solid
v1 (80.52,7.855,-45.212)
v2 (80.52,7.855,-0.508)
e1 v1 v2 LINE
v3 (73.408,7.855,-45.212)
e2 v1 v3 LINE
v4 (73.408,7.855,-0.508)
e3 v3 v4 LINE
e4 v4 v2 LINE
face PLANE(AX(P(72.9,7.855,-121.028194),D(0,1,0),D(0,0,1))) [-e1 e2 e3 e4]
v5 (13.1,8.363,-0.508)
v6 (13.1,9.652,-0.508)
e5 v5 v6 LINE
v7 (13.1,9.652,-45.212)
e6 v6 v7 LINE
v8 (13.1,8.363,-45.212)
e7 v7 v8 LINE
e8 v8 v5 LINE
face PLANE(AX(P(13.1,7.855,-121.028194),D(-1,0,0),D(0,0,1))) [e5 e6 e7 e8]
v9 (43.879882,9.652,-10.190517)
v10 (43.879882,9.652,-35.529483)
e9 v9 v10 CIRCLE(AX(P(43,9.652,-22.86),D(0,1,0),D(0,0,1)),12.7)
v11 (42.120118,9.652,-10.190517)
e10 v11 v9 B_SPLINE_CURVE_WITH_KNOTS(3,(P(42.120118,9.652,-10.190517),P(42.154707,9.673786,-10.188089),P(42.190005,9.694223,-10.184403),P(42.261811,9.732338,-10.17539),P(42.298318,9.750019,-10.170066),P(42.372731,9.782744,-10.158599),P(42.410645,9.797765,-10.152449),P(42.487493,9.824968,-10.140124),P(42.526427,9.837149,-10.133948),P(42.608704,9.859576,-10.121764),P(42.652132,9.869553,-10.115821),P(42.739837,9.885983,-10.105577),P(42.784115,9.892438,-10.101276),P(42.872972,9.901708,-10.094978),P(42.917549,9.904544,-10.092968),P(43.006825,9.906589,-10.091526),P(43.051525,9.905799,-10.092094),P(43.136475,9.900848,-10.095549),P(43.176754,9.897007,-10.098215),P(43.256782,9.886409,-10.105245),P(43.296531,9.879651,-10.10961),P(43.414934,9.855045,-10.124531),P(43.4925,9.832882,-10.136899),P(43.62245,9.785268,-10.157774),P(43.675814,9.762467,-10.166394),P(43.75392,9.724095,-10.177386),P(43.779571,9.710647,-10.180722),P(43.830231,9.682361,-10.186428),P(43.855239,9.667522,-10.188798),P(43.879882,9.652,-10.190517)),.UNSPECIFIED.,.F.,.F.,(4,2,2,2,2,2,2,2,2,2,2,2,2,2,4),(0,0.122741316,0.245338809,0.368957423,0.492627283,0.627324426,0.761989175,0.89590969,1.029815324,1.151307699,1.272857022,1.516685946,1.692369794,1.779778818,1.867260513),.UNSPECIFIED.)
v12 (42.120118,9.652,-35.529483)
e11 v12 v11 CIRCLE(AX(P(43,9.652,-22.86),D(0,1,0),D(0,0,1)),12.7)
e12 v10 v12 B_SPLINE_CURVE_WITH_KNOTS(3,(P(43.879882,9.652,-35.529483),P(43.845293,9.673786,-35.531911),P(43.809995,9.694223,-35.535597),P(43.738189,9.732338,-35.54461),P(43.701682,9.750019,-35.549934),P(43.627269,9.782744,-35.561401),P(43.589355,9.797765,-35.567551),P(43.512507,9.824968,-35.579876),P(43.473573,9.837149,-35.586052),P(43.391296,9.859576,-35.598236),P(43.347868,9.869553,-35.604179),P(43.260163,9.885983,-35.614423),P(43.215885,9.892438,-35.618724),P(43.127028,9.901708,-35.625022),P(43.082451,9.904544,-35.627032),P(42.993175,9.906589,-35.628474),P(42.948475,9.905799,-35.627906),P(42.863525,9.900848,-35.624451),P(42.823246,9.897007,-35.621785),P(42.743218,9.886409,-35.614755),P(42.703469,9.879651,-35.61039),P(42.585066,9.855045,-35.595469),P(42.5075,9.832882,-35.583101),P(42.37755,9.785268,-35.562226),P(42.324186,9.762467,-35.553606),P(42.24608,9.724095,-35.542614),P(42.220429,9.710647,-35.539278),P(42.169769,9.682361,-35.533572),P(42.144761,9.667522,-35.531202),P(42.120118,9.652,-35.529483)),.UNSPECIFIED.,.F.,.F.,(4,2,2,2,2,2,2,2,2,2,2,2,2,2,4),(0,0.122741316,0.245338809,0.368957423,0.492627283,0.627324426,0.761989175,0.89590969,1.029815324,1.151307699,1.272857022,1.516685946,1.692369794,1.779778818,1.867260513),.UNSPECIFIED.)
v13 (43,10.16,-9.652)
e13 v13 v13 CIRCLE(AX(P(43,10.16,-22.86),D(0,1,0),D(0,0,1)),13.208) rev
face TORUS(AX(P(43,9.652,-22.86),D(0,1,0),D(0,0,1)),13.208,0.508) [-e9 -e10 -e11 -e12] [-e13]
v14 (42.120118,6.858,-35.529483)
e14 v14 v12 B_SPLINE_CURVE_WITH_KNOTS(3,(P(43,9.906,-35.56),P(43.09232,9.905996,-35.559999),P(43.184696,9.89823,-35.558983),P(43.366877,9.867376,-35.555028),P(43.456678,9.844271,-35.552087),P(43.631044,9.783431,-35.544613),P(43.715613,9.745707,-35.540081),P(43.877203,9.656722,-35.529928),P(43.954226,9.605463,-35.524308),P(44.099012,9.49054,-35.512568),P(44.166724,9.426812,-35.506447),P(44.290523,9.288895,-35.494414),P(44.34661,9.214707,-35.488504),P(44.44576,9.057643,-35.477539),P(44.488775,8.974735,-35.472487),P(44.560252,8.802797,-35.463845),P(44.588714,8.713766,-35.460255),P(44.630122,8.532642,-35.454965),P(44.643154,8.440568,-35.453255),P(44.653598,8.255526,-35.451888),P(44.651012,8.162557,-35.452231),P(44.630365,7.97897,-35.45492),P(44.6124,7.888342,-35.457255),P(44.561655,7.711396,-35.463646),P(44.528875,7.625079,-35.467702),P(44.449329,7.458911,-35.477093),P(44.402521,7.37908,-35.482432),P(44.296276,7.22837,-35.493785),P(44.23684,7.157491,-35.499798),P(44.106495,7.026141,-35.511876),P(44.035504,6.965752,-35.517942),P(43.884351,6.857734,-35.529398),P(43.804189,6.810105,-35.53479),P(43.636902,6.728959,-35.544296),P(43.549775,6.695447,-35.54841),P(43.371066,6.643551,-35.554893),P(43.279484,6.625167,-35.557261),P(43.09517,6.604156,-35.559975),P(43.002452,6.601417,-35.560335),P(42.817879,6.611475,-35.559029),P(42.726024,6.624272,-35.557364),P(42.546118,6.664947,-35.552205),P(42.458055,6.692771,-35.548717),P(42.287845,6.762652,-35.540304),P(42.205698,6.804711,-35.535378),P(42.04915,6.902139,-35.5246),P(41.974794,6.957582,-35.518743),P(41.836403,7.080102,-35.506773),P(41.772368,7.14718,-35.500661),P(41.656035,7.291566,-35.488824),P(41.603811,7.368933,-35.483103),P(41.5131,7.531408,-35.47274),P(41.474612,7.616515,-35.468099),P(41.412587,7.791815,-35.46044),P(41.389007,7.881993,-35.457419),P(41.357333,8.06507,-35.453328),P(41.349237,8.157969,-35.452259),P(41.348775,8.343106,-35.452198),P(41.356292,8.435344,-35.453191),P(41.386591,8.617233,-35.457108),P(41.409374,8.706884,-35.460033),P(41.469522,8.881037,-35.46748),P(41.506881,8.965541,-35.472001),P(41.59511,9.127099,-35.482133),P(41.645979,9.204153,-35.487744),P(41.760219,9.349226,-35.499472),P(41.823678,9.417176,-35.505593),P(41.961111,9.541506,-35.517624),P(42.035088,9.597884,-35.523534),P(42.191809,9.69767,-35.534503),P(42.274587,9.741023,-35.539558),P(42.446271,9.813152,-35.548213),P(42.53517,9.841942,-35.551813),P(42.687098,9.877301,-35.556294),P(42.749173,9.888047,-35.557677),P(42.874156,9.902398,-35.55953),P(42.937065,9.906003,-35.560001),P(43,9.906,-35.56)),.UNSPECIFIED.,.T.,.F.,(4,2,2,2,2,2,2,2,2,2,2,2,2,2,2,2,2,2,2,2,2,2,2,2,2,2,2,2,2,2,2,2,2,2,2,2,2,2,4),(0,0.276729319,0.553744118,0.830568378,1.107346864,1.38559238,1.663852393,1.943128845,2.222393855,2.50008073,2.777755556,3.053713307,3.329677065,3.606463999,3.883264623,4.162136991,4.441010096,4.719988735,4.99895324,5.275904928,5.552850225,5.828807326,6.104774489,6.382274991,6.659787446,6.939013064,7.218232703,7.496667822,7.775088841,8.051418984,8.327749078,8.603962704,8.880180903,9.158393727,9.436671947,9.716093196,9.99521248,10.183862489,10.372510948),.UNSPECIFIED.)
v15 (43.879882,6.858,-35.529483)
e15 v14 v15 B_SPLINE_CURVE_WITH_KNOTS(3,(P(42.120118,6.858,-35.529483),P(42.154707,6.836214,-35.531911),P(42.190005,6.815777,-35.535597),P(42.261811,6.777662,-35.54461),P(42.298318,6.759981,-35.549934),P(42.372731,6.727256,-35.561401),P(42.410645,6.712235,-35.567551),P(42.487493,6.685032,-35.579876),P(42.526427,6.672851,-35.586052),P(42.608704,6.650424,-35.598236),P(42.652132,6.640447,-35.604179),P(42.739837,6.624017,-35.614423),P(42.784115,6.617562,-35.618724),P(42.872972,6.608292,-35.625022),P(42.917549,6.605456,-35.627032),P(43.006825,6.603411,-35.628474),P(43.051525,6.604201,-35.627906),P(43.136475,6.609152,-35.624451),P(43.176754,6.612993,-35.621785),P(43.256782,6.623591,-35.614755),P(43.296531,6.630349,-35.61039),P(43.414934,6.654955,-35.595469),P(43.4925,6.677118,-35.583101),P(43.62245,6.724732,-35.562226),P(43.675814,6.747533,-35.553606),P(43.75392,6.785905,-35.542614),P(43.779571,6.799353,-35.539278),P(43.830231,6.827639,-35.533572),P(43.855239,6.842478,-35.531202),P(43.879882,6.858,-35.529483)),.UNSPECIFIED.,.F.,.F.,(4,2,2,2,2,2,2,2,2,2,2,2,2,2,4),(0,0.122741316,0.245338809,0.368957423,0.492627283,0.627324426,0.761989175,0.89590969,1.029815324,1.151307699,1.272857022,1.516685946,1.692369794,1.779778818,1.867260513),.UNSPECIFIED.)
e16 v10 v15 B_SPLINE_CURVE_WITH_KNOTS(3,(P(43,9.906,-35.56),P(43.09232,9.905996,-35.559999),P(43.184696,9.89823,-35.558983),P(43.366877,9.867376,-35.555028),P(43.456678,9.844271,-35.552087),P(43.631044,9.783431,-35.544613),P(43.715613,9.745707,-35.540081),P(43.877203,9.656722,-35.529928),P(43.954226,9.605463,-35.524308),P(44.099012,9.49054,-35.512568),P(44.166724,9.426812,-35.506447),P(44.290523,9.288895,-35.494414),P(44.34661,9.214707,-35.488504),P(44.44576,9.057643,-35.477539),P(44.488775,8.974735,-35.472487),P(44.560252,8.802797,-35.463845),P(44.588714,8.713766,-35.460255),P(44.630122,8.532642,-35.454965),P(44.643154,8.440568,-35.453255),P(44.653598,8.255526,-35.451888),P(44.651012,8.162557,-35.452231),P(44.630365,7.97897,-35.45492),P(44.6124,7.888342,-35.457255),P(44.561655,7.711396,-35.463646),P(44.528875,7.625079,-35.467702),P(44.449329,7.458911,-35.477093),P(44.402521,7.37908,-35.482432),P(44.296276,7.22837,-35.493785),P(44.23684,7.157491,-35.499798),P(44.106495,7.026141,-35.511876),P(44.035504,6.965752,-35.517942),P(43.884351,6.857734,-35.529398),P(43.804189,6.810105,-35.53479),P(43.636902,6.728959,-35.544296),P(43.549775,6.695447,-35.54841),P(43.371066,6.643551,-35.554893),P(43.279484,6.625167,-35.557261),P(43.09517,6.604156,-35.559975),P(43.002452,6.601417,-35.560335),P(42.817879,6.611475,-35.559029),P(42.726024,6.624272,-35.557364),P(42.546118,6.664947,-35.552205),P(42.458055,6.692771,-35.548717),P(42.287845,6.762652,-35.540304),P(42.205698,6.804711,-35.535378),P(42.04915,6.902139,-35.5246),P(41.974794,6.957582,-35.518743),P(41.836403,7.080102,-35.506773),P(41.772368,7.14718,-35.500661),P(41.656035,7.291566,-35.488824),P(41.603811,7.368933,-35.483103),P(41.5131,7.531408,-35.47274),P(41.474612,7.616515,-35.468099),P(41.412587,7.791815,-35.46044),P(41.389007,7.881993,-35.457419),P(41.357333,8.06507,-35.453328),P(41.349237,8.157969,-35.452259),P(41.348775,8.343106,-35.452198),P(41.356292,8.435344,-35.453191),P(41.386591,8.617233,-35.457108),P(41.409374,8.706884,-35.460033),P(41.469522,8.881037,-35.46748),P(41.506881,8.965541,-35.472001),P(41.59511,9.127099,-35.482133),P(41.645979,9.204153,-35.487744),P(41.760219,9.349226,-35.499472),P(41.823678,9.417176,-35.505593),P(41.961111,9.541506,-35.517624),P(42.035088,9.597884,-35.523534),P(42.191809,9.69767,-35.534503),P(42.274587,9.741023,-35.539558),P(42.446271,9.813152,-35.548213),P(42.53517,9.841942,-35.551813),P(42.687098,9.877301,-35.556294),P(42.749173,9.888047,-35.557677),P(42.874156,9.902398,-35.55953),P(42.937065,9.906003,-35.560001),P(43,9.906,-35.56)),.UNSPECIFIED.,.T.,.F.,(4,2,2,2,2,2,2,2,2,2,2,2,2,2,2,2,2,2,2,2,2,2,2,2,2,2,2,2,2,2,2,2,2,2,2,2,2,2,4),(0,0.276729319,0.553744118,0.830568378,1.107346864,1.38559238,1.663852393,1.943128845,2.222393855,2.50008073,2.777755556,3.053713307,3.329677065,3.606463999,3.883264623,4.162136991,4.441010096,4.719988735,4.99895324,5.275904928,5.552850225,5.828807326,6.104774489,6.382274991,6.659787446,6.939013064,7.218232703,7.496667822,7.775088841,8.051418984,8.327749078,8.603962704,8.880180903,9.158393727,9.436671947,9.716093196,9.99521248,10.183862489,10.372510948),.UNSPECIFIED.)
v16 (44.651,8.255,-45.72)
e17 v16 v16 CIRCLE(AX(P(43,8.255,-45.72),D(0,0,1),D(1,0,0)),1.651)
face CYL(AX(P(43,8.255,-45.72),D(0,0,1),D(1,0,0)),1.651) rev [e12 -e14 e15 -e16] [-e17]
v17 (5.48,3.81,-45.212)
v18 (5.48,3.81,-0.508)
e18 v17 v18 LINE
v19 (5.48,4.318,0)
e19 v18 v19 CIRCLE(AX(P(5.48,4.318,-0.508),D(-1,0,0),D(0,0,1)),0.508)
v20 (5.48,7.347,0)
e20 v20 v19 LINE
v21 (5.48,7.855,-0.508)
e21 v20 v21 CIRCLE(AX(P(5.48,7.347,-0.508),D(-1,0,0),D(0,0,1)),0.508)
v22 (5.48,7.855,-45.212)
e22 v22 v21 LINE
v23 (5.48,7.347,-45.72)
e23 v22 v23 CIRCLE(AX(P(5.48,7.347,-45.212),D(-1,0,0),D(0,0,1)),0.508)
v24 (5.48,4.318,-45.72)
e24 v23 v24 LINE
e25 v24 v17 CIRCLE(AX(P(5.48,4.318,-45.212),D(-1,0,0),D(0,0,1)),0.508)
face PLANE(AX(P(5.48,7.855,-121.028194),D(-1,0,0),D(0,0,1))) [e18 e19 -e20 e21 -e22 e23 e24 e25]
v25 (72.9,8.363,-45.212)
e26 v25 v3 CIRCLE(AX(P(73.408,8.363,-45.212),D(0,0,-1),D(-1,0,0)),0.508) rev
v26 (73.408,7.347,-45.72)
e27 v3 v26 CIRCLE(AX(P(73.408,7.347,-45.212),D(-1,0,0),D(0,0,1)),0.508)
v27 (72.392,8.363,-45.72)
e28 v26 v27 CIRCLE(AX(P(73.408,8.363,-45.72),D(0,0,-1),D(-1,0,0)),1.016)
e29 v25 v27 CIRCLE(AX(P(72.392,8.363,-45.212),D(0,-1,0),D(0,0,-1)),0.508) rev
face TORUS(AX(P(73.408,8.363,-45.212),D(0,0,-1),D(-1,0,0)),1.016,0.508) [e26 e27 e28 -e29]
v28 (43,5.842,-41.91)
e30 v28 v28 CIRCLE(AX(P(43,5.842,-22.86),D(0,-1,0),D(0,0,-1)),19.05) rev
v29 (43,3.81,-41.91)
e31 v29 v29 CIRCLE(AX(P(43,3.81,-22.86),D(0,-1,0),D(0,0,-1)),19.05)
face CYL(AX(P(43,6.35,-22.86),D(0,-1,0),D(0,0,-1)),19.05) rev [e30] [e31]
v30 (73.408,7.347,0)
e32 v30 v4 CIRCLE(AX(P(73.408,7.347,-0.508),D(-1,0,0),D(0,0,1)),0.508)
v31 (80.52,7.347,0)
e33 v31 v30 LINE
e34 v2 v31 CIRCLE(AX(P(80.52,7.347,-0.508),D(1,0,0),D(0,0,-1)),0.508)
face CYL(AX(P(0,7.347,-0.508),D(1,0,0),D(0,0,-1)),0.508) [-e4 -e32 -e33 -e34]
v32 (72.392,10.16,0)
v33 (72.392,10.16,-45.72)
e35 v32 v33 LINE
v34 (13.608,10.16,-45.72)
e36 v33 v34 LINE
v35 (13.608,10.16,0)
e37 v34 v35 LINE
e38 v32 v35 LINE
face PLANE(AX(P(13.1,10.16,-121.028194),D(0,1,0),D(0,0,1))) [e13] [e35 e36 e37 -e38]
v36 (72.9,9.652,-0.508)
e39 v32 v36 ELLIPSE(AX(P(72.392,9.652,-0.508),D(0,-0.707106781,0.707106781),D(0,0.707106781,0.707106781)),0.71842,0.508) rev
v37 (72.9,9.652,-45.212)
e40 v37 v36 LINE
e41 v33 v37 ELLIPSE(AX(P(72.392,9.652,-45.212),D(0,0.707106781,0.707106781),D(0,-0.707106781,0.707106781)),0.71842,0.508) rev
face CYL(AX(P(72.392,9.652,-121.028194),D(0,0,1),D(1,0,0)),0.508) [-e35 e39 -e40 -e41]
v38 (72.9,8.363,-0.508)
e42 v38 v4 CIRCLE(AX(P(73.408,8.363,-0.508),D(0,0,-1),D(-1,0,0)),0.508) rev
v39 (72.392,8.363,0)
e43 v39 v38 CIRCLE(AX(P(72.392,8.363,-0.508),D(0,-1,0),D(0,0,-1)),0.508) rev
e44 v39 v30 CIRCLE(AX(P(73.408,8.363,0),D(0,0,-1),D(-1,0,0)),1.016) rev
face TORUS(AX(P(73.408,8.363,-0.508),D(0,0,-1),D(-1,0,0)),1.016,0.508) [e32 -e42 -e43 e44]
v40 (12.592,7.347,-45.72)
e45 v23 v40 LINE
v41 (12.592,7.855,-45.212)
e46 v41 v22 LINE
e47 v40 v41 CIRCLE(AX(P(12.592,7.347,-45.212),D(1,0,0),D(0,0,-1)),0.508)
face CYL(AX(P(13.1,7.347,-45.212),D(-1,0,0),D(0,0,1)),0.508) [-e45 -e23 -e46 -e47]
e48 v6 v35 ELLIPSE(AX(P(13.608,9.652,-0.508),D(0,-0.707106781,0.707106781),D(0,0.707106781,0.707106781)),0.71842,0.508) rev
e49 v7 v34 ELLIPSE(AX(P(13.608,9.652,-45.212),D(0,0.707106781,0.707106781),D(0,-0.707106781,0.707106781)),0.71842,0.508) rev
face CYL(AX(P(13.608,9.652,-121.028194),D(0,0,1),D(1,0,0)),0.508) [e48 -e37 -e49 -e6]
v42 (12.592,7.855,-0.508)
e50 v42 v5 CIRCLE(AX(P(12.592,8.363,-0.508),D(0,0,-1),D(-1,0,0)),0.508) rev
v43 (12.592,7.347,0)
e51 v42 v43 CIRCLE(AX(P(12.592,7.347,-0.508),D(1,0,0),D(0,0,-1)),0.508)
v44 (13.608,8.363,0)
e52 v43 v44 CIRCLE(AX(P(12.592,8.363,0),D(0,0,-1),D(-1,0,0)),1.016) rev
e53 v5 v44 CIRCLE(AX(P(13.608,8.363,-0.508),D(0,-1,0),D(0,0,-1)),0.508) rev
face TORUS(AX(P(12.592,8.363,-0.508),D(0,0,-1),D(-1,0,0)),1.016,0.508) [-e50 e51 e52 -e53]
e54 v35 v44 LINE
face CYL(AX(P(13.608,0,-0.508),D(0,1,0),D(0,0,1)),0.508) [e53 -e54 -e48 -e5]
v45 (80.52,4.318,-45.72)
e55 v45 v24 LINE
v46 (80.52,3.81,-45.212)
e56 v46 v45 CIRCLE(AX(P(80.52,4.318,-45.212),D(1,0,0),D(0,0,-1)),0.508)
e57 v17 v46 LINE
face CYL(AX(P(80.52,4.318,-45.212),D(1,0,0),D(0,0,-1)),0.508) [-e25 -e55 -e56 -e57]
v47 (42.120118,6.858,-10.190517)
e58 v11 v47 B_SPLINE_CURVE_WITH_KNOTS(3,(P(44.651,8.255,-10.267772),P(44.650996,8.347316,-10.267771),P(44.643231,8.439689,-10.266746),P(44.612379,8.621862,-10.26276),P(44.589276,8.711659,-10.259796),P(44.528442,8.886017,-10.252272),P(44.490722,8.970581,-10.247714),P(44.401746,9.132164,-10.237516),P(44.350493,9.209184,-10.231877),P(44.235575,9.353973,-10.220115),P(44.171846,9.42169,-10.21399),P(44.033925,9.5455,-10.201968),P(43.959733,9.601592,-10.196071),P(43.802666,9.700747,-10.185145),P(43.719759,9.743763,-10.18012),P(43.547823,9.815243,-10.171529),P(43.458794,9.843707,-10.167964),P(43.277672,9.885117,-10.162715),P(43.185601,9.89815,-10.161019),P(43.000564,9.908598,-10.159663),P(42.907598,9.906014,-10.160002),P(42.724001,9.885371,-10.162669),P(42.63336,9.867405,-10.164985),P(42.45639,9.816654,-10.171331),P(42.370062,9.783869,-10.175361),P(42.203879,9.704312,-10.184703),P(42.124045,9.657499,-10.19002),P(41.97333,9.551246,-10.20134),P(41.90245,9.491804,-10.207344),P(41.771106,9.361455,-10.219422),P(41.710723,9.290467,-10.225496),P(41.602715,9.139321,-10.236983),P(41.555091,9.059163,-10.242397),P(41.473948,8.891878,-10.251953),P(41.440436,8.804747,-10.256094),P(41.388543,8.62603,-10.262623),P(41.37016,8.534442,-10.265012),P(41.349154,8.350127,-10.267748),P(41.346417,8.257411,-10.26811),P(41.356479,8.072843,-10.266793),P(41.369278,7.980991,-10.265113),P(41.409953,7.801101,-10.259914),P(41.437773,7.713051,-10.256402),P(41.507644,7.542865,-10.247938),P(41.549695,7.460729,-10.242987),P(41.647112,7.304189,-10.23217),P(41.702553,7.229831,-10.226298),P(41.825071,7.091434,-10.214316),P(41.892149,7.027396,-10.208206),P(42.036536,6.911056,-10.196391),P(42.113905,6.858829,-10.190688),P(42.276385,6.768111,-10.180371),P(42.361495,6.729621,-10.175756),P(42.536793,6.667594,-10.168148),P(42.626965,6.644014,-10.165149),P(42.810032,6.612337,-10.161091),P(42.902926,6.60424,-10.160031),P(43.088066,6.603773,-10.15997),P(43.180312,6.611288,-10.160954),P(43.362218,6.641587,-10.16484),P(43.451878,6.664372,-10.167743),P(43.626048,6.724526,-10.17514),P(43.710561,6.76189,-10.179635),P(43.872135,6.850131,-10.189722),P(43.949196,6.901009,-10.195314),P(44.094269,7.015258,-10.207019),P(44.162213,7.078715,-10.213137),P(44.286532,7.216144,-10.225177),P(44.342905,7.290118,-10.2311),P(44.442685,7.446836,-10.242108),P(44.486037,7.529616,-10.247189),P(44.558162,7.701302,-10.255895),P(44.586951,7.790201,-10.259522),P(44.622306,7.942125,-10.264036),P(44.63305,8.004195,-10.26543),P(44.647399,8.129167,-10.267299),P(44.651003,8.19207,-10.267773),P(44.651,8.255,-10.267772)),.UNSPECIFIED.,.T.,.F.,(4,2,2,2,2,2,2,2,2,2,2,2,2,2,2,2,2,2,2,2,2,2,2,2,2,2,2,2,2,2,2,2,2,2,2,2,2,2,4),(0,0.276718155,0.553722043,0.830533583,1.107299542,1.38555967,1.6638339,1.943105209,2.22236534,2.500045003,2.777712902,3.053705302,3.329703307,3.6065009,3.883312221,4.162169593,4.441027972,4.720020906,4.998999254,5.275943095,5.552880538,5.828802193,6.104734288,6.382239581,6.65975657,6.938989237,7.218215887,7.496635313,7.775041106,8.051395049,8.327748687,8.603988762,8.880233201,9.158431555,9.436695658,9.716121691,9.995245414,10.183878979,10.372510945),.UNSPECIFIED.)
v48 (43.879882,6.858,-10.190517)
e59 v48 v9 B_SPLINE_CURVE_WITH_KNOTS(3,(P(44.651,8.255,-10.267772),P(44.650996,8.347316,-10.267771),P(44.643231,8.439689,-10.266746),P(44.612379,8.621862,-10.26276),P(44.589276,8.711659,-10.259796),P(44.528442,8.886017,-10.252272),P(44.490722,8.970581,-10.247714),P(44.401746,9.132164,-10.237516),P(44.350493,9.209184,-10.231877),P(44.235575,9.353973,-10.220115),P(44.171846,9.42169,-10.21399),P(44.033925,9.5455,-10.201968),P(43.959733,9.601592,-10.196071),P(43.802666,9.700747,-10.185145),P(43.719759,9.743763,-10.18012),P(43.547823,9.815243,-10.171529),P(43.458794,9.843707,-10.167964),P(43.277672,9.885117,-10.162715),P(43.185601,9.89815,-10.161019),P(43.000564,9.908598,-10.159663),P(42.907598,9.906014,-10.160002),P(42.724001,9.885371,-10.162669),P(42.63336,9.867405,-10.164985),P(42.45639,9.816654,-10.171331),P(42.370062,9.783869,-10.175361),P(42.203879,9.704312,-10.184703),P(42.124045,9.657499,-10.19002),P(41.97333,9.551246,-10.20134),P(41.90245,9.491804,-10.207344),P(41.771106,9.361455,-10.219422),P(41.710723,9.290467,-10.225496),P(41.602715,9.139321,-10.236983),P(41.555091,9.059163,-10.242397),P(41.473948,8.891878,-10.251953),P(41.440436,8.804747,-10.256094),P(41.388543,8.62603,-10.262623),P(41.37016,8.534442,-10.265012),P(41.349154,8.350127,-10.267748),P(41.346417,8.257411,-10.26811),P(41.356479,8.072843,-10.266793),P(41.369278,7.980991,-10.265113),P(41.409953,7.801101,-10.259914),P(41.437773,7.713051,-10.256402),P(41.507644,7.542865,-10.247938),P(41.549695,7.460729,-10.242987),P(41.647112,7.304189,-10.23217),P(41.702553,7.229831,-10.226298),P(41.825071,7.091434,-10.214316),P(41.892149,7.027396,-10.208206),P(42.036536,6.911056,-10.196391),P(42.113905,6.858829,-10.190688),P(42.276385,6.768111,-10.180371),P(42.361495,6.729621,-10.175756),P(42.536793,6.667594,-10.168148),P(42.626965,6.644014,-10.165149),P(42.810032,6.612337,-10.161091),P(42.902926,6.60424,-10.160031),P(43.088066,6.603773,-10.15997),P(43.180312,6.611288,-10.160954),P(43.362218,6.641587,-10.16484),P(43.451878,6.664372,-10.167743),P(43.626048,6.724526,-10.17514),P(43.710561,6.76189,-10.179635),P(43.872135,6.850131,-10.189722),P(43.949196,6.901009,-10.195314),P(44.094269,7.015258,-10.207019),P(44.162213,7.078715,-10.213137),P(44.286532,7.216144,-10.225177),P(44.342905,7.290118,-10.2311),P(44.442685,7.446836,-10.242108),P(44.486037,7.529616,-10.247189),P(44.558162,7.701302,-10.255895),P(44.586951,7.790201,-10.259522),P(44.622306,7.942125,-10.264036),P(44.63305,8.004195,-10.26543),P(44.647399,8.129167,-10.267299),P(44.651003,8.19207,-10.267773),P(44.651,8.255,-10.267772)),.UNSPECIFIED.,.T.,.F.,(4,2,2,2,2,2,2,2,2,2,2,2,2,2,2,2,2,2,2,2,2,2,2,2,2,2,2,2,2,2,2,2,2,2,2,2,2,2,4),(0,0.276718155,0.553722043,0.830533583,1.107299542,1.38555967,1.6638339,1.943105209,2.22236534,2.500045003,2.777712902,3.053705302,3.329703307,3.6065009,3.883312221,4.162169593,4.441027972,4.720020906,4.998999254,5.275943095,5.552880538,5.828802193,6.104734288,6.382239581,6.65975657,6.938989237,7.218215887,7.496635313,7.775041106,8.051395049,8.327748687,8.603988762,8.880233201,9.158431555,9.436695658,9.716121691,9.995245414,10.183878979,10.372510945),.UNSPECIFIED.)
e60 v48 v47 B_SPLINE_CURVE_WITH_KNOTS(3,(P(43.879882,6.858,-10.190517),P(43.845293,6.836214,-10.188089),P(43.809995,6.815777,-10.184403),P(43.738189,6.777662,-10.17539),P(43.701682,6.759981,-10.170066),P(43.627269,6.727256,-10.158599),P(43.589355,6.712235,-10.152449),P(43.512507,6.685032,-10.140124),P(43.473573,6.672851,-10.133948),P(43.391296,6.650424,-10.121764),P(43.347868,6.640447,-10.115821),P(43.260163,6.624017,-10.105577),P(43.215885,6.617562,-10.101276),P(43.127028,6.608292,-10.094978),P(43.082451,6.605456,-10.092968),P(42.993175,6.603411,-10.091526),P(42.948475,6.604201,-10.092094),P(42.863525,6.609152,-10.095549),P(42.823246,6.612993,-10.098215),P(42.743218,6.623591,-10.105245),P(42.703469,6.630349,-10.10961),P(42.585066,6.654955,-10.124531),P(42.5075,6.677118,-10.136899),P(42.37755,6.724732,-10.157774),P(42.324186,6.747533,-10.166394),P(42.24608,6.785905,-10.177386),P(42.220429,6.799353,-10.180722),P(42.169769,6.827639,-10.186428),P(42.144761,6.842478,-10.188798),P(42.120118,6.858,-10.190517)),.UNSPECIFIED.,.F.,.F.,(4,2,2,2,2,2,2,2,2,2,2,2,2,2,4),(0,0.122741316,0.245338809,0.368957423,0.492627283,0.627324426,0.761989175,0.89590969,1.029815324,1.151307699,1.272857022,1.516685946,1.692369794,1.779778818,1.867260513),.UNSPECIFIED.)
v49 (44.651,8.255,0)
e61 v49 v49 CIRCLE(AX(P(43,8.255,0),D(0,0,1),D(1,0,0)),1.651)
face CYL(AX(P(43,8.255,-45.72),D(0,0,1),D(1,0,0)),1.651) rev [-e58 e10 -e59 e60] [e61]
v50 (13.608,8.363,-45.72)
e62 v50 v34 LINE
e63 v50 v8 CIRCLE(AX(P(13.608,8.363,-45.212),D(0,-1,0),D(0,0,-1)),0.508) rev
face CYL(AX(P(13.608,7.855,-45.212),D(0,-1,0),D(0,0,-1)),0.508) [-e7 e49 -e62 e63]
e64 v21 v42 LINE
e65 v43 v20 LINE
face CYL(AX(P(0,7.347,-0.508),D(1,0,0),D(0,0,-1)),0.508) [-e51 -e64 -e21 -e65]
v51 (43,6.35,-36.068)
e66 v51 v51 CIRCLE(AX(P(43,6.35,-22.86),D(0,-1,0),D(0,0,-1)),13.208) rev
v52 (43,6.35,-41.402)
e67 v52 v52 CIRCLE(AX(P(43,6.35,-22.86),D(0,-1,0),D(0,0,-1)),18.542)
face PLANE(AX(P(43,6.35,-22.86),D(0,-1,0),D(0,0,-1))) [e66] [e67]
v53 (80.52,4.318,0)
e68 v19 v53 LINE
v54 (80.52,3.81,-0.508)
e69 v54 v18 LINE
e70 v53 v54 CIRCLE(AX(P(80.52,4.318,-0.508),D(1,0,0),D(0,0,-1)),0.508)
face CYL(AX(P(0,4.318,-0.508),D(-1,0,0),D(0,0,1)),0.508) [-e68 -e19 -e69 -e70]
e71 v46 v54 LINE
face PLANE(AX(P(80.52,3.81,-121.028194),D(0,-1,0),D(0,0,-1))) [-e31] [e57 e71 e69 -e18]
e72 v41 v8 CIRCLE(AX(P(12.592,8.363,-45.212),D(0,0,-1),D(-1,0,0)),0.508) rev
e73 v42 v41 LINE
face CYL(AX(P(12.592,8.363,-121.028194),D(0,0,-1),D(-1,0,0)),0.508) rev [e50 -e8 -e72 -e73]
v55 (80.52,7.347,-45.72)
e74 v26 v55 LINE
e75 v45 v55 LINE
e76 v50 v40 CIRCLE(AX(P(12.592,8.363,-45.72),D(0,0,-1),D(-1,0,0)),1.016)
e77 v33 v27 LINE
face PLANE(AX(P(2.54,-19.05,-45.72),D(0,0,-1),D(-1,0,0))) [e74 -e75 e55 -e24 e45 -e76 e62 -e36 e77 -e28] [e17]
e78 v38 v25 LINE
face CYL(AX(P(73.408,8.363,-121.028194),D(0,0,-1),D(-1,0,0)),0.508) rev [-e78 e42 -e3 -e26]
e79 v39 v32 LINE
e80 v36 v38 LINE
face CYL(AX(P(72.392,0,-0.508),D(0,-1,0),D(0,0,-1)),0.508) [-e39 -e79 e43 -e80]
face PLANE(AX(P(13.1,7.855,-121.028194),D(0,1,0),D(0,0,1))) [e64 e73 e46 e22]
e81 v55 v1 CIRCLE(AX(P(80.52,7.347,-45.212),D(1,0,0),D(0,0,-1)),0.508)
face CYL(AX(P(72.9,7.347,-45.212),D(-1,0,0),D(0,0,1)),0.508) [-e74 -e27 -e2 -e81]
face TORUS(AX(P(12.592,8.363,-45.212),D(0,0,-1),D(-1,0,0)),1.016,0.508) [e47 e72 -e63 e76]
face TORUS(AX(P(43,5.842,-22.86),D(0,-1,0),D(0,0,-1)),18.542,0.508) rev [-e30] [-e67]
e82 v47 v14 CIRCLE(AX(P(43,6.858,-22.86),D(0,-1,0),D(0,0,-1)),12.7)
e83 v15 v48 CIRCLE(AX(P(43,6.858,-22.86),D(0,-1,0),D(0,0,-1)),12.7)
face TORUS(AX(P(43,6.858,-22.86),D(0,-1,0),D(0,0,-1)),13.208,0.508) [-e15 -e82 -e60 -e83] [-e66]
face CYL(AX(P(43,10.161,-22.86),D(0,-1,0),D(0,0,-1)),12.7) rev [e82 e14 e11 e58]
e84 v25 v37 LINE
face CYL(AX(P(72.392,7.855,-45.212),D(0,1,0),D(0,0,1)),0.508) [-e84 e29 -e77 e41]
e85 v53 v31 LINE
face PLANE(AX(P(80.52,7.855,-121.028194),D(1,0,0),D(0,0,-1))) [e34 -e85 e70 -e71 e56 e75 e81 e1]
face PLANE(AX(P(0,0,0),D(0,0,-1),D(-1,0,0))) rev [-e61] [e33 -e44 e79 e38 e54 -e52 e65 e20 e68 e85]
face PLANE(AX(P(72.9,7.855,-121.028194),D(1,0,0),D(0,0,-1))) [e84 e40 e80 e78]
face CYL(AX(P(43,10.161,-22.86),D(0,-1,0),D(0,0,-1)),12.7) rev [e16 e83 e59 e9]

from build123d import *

# Parameters (mm, degrees)
BOSS_EXTRUDE1_DEPTH = 45.72
CUT_EXTRUDE1_REACH  = 94.812
SKETCH2_R           = 12.7
SKETCH4_R           = 19.05
CUT_EXTRUDE2_DEPTH  = 2.54
SKETCH5_R           = 1.651
CUT_EXTRUDE3_DEPTH  = 94.150493289
FILLET1_R           = 0.508


with BuildPart() as part:
    # Sketch1 → Boss-Extrude1 (new body)
    with BuildSketch(Plane.XY):
        Polygon((13.1, 7.855), (5.48, 7.855), (5.48, 3.81), (80.52, 3.81), (80.52, 7.855), (72.9, 7.855), (72.9, 10.16), (13.1, 10.16), align=None)
    extrude(amount=-BOSS_EXTRUDE1_DEPTH)

    # Sketch2 → Cut-Extrude1 (cut, up to next)
    with BuildSketch(Plane.XZ.offset(-3.81), mode=Mode.PRIVATE) as cut_extrude1_sk1:
        with Locations(Location((43, -22.86, 0), (0, 0, 270))):
            Circle(SKETCH2_R)
    cut_extrude1_tool1 = extrude(cut_extrude1_sk1.sketch, amount=-CUT_EXTRUDE1_REACH, mode=Mode.PRIVATE) & part.part
    add(cut_extrude1_tool1.solids().sort_by_distance((43, 3.81, -22.86))[0], mode=Mode.SUBTRACT)

    # Sketch4 → Cut-Extrude2 (cut)
    with BuildSketch(Plane.XZ.offset(-3.81)):
        with Locations(Location((43, -22.86, 0), (0, 0, 270))):
            Circle(SKETCH4_R)
    extrude(amount=-CUT_EXTRUDE2_DEPTH, mode=Mode.SUBTRACT)

    # Sketch5 → Cut-Extrude3 (cut, through all)
    with BuildSketch(Plane.XY):
        with Locations((43, 8.255)):
            Circle(SKETCH5_R)
    extrude(amount=-CUT_EXTRUDE3_DEPTH, mode=Mode.SUBTRACT)

    # Fillet1
    # the kernel refuses this fillet: 0.508 mm, written as the material it adds along each edge
    with BuildSketch(Plane(origin=(43, 6.35, -22.86), x_dir=(0, 0, -1), z_dir=(-1, 0, 0))) as fillet1_piece_1:
        with BuildLine():
            CenterArc((19.05 - FILLET1_R, FILLET1_R), FILLET1_R, 270, 90)
            Line((19.05 - FILLET1_R, 0), (19.05, 0))
            Line((19.05, 0), (19.05, FILLET1_R))
        make_face()
    revolve(axis=Axis((43, 6.35, -22.86), (0, -1, 0)))
    with BuildSketch(Plane(origin=(72.9, 7.855, 0), x_dir=(0, 1, 0), z_dir=(0, 0, -1)), Plane(origin=(13.1, 7.855, 0), x_dir=(-1, 0, 0), z_dir=(0, 0, -1))) as fillet1_piece_2:
        with BuildLine():
            CenterArc((FILLET1_R, FILLET1_R), FILLET1_R, 180, 90)
            Line((0, FILLET1_R), (0, 0))
            Line((0, 0), (FILLET1_R, 0))
        make_face()
    extrude(amount=45.72)
    # the kernel refuses this fillet: 0.508 mm, written as the material it takes off along each edge
    with BuildSketch(Plane(origin=(72.9, 8.363, -45.72), x_dir=(-1, 0, 0), z_dir=(0, 1, 0)), Plane(origin=(13.1, 11.43, -45.72), x_dir=(1, 0, 0), z_dir=(0, -1, 0))) as fillet1_2_piece_1:
        with BuildLine():
            CenterArc((FILLET1_R, FILLET1_R), FILLET1_R, 180, 90)
            Line((0, FILLET1_R), (0, 0))
            Line((0, 0), (FILLET1_R, 0))
        make_face()
    extrude(amount=3.067, mode=Mode.SUBTRACT)
    with BuildSketch(Plane(origin=(72.9, 8.363, 0), x_dir=(-1, 0, 0), z_dir=(0, 1, 0)), Plane(origin=(13.1, 11.43, 0), x_dir=(1, 0, 0), z_dir=(0, -1, 0))) as fillet1_2_piece_2:
        with BuildLine():
            CenterArc((FILLET1_R, -FILLET1_R), FILLET1_R, 90, 90)
            Line((0, -FILLET1_R), (0, 0))
            Line((0, 0), (FILLET1_R, 0))
        make_face()
    extrude(amount=3.067, mode=Mode.SUBTRACT)
    with BuildSketch(Plane(origin=(43, 6.35, -22.86), x_dir=(0, 0, -1), z_dir=(-1, 0, 0))) as fillet1_2_piece_3:
        with BuildLine():
            CenterArc((12.7 + FILLET1_R, -FILLET1_R), FILLET1_R, 90, 90)
            Line((12.7 + FILLET1_R, 0), (12.7, 0))
            Line((12.7, 0), (12.7, -FILLET1_R))
        make_face()
    revolve(axis=Axis((43, 6.35, -22.86), (0, -1, 0)), mode=Mode.SUBTRACT)
    with BuildSketch(Plane(origin=(4.21, 3.81, -45.72), x_dir=(0, 1, 0), z_dir=(1, 0, 0))) as fillet1_2_piece_4:
        with BuildLine():
            CenterArc((FILLET1_R, FILLET1_R), FILLET1_R, 180, 90)
            Line((0, FILLET1_R), (0, 0))
            Line((0, 0), (FILLET1_R, 0))
        make_face()
    extrude(amount=77.58, mode=Mode.SUBTRACT)
    with BuildSketch(Plane(origin=(4.21, 3.81, 0), x_dir=(0, 1, 0), z_dir=(1, 0, 0))) as fillet1_2_piece_5:
        with BuildLine():
            CenterArc((FILLET1_R, -FILLET1_R), FILLET1_R, 90, 90)
            Line((0, -FILLET1_R), (0, 0))
            Line((0, 0), (FILLET1_R, 0))
        make_face()
    extrude(amount=77.58, mode=Mode.SUBTRACT)
    with BuildSketch(Plane(origin=(81.79, 7.855, -45.72), x_dir=(0, -1, 0), z_dir=(-1, 0, 0)), Plane(origin=(12.592, 7.855, 0), x_dir=(0, 0, -1), z_dir=(-1, 0, 0))) as fillet1_2_piece_6:
        with BuildLine():
            CenterArc((FILLET1_R, FILLET1_R), FILLET1_R, 180, 90)
            Line((0, FILLET1_R), (0, 0))
            Line((0, 0), (FILLET1_R, 0))
        make_face()
    extrude(amount=8.382, mode=Mode.SUBTRACT)
    with BuildSketch(Plane(origin=(81.79, 7.855, 0), x_dir=(0, -1, 0), z_dir=(-1, 0, 0)), Plane(origin=(12.592, 7.855, -45.72), x_dir=(0, 0, 1), z_dir=(-1, 0, 0))) as fillet1_2_piece_7:
        with BuildLine():
            CenterArc((FILLET1_R, -FILLET1_R), FILLET1_R, 90, 90)
            Line((0, -FILLET1_R), (0, 0))
            Line((0, 0), (FILLET1_R, 0))
        make_face()
    extrude(amount=8.382, mode=Mode.SUBTRACT)
    with BuildSketch(Plane(origin=(72.9, 10.16, 1.27), x_dir=(-1, 0, 0), z_dir=(0, 0, -1)), Plane(origin=(13.1, 10.16, 1.27), x_dir=(0, -1, 0), z_dir=(0, 0, -1))) as fillet1_2_piece_8:
        with BuildLine():
            CenterArc((FILLET1_R, -FILLET1_R), FILLET1_R, 90, 90)
            Line((0, -FILLET1_R), (0, 0))
            Line((0, 0), (FILLET1_R, 0))
        make_face()
    extrude(amount=48.26, mode=Mode.SUBTRACT)
    with BuildSketch(Plane(origin=(43, 10.16, -22.86), x_dir=(0, 0, -1), z_dir=(-1, 0, 0))) as fillet1_2_piece_9:
        with BuildLine():
            CenterArc((12.7 + FILLET1_R, FILLET1_R), FILLET1_R, 180, 90)
            Line((12.7, FILLET1_R), (12.7, 0))
            Line((12.7, 0), (12.7 + FILLET1_R, 0))
        make_face()
    revolve(axis=Axis((43, 10.16, -22.86), (0, -1, 0)), mode=Mode.SUBTRACT)
    with BuildSketch(Plane(origin=(12.592, 8.363, 0), x_dir=(0, -1, 0), z_dir=(-1, 0, 0))) as fillet1_2_piece_10:
        with BuildLine():
            CenterArc((0.508 + FILLET1_R, -FILLET1_R), FILLET1_R, 90, 90)
            Line((0.508, -FILLET1_R), (0.508, 0))
            Line((0.508, 0), (0.508 + FILLET1_R, 0))
        make_face()
    revolve(axis=Axis((12.592, 8.363, 0), (0, 0, 1)), revolution_arc=90, mode=Mode.SUBTRACT)
    with BuildSketch(Plane(origin=(12.592, 8.363, -45.72), x_dir=(0, -1, 0), z_dir=(-1, 0, 0))) as fillet1_2_piece_11:
        with BuildLine():
            CenterArc((0.508 + FILLET1_R, FILLET1_R), FILLET1_R, 180, 90)
            Line((0.508, FILLET1_R), (0.508, 0))
            Line((0.508, 0), (0.508 + FILLET1_R, 0))
        make_face()
    revolve(axis=Axis((12.592, 8.363, -45.72), (0, 0, 1)), revolution_arc=90, mode=Mode.SUBTRACT)
    with BuildSketch(Plane(origin=(73.408, 8.363, 0), x_dir=(-1, 0, 0), z_dir=(0, 1, 0))) as fillet1_2_piece_12:
        with BuildLine():
            CenterArc((0.508 + FILLET1_R, -FILLET1_R), FILLET1_R, 90, 90)
            Line((0.508, -FILLET1_R), (0.508, 0))
            Line((0.508, 0), (0.508 + FILLET1_R, 0))
        make_face()
    revolve(axis=Axis((73.408, 8.363, 0), (0, 0, 1)), revolution_arc=90, mode=Mode.SUBTRACT)
    with BuildSketch(Plane(origin=(73.408, 8.363, -45.72), x_dir=(-1, 0, 0), z_dir=(0, 1, 0))) as fillet1_2_piece_13:
        with BuildLine():
            CenterArc((0.508 + FILLET1_R, FILLET1_R), FILLET1_R, 180, 90)
            Line((0.508, FILLET1_R), (0.508, 0))
            Line((0.508, 0), (0.508 + FILLET1_R, 0))
        make_face()
    revolve(axis=Axis((73.408, 8.363, -45.72), (0, 0, 1)), revolution_arc=90, mode=Mode.SUBTRACT)


solid = part.part
